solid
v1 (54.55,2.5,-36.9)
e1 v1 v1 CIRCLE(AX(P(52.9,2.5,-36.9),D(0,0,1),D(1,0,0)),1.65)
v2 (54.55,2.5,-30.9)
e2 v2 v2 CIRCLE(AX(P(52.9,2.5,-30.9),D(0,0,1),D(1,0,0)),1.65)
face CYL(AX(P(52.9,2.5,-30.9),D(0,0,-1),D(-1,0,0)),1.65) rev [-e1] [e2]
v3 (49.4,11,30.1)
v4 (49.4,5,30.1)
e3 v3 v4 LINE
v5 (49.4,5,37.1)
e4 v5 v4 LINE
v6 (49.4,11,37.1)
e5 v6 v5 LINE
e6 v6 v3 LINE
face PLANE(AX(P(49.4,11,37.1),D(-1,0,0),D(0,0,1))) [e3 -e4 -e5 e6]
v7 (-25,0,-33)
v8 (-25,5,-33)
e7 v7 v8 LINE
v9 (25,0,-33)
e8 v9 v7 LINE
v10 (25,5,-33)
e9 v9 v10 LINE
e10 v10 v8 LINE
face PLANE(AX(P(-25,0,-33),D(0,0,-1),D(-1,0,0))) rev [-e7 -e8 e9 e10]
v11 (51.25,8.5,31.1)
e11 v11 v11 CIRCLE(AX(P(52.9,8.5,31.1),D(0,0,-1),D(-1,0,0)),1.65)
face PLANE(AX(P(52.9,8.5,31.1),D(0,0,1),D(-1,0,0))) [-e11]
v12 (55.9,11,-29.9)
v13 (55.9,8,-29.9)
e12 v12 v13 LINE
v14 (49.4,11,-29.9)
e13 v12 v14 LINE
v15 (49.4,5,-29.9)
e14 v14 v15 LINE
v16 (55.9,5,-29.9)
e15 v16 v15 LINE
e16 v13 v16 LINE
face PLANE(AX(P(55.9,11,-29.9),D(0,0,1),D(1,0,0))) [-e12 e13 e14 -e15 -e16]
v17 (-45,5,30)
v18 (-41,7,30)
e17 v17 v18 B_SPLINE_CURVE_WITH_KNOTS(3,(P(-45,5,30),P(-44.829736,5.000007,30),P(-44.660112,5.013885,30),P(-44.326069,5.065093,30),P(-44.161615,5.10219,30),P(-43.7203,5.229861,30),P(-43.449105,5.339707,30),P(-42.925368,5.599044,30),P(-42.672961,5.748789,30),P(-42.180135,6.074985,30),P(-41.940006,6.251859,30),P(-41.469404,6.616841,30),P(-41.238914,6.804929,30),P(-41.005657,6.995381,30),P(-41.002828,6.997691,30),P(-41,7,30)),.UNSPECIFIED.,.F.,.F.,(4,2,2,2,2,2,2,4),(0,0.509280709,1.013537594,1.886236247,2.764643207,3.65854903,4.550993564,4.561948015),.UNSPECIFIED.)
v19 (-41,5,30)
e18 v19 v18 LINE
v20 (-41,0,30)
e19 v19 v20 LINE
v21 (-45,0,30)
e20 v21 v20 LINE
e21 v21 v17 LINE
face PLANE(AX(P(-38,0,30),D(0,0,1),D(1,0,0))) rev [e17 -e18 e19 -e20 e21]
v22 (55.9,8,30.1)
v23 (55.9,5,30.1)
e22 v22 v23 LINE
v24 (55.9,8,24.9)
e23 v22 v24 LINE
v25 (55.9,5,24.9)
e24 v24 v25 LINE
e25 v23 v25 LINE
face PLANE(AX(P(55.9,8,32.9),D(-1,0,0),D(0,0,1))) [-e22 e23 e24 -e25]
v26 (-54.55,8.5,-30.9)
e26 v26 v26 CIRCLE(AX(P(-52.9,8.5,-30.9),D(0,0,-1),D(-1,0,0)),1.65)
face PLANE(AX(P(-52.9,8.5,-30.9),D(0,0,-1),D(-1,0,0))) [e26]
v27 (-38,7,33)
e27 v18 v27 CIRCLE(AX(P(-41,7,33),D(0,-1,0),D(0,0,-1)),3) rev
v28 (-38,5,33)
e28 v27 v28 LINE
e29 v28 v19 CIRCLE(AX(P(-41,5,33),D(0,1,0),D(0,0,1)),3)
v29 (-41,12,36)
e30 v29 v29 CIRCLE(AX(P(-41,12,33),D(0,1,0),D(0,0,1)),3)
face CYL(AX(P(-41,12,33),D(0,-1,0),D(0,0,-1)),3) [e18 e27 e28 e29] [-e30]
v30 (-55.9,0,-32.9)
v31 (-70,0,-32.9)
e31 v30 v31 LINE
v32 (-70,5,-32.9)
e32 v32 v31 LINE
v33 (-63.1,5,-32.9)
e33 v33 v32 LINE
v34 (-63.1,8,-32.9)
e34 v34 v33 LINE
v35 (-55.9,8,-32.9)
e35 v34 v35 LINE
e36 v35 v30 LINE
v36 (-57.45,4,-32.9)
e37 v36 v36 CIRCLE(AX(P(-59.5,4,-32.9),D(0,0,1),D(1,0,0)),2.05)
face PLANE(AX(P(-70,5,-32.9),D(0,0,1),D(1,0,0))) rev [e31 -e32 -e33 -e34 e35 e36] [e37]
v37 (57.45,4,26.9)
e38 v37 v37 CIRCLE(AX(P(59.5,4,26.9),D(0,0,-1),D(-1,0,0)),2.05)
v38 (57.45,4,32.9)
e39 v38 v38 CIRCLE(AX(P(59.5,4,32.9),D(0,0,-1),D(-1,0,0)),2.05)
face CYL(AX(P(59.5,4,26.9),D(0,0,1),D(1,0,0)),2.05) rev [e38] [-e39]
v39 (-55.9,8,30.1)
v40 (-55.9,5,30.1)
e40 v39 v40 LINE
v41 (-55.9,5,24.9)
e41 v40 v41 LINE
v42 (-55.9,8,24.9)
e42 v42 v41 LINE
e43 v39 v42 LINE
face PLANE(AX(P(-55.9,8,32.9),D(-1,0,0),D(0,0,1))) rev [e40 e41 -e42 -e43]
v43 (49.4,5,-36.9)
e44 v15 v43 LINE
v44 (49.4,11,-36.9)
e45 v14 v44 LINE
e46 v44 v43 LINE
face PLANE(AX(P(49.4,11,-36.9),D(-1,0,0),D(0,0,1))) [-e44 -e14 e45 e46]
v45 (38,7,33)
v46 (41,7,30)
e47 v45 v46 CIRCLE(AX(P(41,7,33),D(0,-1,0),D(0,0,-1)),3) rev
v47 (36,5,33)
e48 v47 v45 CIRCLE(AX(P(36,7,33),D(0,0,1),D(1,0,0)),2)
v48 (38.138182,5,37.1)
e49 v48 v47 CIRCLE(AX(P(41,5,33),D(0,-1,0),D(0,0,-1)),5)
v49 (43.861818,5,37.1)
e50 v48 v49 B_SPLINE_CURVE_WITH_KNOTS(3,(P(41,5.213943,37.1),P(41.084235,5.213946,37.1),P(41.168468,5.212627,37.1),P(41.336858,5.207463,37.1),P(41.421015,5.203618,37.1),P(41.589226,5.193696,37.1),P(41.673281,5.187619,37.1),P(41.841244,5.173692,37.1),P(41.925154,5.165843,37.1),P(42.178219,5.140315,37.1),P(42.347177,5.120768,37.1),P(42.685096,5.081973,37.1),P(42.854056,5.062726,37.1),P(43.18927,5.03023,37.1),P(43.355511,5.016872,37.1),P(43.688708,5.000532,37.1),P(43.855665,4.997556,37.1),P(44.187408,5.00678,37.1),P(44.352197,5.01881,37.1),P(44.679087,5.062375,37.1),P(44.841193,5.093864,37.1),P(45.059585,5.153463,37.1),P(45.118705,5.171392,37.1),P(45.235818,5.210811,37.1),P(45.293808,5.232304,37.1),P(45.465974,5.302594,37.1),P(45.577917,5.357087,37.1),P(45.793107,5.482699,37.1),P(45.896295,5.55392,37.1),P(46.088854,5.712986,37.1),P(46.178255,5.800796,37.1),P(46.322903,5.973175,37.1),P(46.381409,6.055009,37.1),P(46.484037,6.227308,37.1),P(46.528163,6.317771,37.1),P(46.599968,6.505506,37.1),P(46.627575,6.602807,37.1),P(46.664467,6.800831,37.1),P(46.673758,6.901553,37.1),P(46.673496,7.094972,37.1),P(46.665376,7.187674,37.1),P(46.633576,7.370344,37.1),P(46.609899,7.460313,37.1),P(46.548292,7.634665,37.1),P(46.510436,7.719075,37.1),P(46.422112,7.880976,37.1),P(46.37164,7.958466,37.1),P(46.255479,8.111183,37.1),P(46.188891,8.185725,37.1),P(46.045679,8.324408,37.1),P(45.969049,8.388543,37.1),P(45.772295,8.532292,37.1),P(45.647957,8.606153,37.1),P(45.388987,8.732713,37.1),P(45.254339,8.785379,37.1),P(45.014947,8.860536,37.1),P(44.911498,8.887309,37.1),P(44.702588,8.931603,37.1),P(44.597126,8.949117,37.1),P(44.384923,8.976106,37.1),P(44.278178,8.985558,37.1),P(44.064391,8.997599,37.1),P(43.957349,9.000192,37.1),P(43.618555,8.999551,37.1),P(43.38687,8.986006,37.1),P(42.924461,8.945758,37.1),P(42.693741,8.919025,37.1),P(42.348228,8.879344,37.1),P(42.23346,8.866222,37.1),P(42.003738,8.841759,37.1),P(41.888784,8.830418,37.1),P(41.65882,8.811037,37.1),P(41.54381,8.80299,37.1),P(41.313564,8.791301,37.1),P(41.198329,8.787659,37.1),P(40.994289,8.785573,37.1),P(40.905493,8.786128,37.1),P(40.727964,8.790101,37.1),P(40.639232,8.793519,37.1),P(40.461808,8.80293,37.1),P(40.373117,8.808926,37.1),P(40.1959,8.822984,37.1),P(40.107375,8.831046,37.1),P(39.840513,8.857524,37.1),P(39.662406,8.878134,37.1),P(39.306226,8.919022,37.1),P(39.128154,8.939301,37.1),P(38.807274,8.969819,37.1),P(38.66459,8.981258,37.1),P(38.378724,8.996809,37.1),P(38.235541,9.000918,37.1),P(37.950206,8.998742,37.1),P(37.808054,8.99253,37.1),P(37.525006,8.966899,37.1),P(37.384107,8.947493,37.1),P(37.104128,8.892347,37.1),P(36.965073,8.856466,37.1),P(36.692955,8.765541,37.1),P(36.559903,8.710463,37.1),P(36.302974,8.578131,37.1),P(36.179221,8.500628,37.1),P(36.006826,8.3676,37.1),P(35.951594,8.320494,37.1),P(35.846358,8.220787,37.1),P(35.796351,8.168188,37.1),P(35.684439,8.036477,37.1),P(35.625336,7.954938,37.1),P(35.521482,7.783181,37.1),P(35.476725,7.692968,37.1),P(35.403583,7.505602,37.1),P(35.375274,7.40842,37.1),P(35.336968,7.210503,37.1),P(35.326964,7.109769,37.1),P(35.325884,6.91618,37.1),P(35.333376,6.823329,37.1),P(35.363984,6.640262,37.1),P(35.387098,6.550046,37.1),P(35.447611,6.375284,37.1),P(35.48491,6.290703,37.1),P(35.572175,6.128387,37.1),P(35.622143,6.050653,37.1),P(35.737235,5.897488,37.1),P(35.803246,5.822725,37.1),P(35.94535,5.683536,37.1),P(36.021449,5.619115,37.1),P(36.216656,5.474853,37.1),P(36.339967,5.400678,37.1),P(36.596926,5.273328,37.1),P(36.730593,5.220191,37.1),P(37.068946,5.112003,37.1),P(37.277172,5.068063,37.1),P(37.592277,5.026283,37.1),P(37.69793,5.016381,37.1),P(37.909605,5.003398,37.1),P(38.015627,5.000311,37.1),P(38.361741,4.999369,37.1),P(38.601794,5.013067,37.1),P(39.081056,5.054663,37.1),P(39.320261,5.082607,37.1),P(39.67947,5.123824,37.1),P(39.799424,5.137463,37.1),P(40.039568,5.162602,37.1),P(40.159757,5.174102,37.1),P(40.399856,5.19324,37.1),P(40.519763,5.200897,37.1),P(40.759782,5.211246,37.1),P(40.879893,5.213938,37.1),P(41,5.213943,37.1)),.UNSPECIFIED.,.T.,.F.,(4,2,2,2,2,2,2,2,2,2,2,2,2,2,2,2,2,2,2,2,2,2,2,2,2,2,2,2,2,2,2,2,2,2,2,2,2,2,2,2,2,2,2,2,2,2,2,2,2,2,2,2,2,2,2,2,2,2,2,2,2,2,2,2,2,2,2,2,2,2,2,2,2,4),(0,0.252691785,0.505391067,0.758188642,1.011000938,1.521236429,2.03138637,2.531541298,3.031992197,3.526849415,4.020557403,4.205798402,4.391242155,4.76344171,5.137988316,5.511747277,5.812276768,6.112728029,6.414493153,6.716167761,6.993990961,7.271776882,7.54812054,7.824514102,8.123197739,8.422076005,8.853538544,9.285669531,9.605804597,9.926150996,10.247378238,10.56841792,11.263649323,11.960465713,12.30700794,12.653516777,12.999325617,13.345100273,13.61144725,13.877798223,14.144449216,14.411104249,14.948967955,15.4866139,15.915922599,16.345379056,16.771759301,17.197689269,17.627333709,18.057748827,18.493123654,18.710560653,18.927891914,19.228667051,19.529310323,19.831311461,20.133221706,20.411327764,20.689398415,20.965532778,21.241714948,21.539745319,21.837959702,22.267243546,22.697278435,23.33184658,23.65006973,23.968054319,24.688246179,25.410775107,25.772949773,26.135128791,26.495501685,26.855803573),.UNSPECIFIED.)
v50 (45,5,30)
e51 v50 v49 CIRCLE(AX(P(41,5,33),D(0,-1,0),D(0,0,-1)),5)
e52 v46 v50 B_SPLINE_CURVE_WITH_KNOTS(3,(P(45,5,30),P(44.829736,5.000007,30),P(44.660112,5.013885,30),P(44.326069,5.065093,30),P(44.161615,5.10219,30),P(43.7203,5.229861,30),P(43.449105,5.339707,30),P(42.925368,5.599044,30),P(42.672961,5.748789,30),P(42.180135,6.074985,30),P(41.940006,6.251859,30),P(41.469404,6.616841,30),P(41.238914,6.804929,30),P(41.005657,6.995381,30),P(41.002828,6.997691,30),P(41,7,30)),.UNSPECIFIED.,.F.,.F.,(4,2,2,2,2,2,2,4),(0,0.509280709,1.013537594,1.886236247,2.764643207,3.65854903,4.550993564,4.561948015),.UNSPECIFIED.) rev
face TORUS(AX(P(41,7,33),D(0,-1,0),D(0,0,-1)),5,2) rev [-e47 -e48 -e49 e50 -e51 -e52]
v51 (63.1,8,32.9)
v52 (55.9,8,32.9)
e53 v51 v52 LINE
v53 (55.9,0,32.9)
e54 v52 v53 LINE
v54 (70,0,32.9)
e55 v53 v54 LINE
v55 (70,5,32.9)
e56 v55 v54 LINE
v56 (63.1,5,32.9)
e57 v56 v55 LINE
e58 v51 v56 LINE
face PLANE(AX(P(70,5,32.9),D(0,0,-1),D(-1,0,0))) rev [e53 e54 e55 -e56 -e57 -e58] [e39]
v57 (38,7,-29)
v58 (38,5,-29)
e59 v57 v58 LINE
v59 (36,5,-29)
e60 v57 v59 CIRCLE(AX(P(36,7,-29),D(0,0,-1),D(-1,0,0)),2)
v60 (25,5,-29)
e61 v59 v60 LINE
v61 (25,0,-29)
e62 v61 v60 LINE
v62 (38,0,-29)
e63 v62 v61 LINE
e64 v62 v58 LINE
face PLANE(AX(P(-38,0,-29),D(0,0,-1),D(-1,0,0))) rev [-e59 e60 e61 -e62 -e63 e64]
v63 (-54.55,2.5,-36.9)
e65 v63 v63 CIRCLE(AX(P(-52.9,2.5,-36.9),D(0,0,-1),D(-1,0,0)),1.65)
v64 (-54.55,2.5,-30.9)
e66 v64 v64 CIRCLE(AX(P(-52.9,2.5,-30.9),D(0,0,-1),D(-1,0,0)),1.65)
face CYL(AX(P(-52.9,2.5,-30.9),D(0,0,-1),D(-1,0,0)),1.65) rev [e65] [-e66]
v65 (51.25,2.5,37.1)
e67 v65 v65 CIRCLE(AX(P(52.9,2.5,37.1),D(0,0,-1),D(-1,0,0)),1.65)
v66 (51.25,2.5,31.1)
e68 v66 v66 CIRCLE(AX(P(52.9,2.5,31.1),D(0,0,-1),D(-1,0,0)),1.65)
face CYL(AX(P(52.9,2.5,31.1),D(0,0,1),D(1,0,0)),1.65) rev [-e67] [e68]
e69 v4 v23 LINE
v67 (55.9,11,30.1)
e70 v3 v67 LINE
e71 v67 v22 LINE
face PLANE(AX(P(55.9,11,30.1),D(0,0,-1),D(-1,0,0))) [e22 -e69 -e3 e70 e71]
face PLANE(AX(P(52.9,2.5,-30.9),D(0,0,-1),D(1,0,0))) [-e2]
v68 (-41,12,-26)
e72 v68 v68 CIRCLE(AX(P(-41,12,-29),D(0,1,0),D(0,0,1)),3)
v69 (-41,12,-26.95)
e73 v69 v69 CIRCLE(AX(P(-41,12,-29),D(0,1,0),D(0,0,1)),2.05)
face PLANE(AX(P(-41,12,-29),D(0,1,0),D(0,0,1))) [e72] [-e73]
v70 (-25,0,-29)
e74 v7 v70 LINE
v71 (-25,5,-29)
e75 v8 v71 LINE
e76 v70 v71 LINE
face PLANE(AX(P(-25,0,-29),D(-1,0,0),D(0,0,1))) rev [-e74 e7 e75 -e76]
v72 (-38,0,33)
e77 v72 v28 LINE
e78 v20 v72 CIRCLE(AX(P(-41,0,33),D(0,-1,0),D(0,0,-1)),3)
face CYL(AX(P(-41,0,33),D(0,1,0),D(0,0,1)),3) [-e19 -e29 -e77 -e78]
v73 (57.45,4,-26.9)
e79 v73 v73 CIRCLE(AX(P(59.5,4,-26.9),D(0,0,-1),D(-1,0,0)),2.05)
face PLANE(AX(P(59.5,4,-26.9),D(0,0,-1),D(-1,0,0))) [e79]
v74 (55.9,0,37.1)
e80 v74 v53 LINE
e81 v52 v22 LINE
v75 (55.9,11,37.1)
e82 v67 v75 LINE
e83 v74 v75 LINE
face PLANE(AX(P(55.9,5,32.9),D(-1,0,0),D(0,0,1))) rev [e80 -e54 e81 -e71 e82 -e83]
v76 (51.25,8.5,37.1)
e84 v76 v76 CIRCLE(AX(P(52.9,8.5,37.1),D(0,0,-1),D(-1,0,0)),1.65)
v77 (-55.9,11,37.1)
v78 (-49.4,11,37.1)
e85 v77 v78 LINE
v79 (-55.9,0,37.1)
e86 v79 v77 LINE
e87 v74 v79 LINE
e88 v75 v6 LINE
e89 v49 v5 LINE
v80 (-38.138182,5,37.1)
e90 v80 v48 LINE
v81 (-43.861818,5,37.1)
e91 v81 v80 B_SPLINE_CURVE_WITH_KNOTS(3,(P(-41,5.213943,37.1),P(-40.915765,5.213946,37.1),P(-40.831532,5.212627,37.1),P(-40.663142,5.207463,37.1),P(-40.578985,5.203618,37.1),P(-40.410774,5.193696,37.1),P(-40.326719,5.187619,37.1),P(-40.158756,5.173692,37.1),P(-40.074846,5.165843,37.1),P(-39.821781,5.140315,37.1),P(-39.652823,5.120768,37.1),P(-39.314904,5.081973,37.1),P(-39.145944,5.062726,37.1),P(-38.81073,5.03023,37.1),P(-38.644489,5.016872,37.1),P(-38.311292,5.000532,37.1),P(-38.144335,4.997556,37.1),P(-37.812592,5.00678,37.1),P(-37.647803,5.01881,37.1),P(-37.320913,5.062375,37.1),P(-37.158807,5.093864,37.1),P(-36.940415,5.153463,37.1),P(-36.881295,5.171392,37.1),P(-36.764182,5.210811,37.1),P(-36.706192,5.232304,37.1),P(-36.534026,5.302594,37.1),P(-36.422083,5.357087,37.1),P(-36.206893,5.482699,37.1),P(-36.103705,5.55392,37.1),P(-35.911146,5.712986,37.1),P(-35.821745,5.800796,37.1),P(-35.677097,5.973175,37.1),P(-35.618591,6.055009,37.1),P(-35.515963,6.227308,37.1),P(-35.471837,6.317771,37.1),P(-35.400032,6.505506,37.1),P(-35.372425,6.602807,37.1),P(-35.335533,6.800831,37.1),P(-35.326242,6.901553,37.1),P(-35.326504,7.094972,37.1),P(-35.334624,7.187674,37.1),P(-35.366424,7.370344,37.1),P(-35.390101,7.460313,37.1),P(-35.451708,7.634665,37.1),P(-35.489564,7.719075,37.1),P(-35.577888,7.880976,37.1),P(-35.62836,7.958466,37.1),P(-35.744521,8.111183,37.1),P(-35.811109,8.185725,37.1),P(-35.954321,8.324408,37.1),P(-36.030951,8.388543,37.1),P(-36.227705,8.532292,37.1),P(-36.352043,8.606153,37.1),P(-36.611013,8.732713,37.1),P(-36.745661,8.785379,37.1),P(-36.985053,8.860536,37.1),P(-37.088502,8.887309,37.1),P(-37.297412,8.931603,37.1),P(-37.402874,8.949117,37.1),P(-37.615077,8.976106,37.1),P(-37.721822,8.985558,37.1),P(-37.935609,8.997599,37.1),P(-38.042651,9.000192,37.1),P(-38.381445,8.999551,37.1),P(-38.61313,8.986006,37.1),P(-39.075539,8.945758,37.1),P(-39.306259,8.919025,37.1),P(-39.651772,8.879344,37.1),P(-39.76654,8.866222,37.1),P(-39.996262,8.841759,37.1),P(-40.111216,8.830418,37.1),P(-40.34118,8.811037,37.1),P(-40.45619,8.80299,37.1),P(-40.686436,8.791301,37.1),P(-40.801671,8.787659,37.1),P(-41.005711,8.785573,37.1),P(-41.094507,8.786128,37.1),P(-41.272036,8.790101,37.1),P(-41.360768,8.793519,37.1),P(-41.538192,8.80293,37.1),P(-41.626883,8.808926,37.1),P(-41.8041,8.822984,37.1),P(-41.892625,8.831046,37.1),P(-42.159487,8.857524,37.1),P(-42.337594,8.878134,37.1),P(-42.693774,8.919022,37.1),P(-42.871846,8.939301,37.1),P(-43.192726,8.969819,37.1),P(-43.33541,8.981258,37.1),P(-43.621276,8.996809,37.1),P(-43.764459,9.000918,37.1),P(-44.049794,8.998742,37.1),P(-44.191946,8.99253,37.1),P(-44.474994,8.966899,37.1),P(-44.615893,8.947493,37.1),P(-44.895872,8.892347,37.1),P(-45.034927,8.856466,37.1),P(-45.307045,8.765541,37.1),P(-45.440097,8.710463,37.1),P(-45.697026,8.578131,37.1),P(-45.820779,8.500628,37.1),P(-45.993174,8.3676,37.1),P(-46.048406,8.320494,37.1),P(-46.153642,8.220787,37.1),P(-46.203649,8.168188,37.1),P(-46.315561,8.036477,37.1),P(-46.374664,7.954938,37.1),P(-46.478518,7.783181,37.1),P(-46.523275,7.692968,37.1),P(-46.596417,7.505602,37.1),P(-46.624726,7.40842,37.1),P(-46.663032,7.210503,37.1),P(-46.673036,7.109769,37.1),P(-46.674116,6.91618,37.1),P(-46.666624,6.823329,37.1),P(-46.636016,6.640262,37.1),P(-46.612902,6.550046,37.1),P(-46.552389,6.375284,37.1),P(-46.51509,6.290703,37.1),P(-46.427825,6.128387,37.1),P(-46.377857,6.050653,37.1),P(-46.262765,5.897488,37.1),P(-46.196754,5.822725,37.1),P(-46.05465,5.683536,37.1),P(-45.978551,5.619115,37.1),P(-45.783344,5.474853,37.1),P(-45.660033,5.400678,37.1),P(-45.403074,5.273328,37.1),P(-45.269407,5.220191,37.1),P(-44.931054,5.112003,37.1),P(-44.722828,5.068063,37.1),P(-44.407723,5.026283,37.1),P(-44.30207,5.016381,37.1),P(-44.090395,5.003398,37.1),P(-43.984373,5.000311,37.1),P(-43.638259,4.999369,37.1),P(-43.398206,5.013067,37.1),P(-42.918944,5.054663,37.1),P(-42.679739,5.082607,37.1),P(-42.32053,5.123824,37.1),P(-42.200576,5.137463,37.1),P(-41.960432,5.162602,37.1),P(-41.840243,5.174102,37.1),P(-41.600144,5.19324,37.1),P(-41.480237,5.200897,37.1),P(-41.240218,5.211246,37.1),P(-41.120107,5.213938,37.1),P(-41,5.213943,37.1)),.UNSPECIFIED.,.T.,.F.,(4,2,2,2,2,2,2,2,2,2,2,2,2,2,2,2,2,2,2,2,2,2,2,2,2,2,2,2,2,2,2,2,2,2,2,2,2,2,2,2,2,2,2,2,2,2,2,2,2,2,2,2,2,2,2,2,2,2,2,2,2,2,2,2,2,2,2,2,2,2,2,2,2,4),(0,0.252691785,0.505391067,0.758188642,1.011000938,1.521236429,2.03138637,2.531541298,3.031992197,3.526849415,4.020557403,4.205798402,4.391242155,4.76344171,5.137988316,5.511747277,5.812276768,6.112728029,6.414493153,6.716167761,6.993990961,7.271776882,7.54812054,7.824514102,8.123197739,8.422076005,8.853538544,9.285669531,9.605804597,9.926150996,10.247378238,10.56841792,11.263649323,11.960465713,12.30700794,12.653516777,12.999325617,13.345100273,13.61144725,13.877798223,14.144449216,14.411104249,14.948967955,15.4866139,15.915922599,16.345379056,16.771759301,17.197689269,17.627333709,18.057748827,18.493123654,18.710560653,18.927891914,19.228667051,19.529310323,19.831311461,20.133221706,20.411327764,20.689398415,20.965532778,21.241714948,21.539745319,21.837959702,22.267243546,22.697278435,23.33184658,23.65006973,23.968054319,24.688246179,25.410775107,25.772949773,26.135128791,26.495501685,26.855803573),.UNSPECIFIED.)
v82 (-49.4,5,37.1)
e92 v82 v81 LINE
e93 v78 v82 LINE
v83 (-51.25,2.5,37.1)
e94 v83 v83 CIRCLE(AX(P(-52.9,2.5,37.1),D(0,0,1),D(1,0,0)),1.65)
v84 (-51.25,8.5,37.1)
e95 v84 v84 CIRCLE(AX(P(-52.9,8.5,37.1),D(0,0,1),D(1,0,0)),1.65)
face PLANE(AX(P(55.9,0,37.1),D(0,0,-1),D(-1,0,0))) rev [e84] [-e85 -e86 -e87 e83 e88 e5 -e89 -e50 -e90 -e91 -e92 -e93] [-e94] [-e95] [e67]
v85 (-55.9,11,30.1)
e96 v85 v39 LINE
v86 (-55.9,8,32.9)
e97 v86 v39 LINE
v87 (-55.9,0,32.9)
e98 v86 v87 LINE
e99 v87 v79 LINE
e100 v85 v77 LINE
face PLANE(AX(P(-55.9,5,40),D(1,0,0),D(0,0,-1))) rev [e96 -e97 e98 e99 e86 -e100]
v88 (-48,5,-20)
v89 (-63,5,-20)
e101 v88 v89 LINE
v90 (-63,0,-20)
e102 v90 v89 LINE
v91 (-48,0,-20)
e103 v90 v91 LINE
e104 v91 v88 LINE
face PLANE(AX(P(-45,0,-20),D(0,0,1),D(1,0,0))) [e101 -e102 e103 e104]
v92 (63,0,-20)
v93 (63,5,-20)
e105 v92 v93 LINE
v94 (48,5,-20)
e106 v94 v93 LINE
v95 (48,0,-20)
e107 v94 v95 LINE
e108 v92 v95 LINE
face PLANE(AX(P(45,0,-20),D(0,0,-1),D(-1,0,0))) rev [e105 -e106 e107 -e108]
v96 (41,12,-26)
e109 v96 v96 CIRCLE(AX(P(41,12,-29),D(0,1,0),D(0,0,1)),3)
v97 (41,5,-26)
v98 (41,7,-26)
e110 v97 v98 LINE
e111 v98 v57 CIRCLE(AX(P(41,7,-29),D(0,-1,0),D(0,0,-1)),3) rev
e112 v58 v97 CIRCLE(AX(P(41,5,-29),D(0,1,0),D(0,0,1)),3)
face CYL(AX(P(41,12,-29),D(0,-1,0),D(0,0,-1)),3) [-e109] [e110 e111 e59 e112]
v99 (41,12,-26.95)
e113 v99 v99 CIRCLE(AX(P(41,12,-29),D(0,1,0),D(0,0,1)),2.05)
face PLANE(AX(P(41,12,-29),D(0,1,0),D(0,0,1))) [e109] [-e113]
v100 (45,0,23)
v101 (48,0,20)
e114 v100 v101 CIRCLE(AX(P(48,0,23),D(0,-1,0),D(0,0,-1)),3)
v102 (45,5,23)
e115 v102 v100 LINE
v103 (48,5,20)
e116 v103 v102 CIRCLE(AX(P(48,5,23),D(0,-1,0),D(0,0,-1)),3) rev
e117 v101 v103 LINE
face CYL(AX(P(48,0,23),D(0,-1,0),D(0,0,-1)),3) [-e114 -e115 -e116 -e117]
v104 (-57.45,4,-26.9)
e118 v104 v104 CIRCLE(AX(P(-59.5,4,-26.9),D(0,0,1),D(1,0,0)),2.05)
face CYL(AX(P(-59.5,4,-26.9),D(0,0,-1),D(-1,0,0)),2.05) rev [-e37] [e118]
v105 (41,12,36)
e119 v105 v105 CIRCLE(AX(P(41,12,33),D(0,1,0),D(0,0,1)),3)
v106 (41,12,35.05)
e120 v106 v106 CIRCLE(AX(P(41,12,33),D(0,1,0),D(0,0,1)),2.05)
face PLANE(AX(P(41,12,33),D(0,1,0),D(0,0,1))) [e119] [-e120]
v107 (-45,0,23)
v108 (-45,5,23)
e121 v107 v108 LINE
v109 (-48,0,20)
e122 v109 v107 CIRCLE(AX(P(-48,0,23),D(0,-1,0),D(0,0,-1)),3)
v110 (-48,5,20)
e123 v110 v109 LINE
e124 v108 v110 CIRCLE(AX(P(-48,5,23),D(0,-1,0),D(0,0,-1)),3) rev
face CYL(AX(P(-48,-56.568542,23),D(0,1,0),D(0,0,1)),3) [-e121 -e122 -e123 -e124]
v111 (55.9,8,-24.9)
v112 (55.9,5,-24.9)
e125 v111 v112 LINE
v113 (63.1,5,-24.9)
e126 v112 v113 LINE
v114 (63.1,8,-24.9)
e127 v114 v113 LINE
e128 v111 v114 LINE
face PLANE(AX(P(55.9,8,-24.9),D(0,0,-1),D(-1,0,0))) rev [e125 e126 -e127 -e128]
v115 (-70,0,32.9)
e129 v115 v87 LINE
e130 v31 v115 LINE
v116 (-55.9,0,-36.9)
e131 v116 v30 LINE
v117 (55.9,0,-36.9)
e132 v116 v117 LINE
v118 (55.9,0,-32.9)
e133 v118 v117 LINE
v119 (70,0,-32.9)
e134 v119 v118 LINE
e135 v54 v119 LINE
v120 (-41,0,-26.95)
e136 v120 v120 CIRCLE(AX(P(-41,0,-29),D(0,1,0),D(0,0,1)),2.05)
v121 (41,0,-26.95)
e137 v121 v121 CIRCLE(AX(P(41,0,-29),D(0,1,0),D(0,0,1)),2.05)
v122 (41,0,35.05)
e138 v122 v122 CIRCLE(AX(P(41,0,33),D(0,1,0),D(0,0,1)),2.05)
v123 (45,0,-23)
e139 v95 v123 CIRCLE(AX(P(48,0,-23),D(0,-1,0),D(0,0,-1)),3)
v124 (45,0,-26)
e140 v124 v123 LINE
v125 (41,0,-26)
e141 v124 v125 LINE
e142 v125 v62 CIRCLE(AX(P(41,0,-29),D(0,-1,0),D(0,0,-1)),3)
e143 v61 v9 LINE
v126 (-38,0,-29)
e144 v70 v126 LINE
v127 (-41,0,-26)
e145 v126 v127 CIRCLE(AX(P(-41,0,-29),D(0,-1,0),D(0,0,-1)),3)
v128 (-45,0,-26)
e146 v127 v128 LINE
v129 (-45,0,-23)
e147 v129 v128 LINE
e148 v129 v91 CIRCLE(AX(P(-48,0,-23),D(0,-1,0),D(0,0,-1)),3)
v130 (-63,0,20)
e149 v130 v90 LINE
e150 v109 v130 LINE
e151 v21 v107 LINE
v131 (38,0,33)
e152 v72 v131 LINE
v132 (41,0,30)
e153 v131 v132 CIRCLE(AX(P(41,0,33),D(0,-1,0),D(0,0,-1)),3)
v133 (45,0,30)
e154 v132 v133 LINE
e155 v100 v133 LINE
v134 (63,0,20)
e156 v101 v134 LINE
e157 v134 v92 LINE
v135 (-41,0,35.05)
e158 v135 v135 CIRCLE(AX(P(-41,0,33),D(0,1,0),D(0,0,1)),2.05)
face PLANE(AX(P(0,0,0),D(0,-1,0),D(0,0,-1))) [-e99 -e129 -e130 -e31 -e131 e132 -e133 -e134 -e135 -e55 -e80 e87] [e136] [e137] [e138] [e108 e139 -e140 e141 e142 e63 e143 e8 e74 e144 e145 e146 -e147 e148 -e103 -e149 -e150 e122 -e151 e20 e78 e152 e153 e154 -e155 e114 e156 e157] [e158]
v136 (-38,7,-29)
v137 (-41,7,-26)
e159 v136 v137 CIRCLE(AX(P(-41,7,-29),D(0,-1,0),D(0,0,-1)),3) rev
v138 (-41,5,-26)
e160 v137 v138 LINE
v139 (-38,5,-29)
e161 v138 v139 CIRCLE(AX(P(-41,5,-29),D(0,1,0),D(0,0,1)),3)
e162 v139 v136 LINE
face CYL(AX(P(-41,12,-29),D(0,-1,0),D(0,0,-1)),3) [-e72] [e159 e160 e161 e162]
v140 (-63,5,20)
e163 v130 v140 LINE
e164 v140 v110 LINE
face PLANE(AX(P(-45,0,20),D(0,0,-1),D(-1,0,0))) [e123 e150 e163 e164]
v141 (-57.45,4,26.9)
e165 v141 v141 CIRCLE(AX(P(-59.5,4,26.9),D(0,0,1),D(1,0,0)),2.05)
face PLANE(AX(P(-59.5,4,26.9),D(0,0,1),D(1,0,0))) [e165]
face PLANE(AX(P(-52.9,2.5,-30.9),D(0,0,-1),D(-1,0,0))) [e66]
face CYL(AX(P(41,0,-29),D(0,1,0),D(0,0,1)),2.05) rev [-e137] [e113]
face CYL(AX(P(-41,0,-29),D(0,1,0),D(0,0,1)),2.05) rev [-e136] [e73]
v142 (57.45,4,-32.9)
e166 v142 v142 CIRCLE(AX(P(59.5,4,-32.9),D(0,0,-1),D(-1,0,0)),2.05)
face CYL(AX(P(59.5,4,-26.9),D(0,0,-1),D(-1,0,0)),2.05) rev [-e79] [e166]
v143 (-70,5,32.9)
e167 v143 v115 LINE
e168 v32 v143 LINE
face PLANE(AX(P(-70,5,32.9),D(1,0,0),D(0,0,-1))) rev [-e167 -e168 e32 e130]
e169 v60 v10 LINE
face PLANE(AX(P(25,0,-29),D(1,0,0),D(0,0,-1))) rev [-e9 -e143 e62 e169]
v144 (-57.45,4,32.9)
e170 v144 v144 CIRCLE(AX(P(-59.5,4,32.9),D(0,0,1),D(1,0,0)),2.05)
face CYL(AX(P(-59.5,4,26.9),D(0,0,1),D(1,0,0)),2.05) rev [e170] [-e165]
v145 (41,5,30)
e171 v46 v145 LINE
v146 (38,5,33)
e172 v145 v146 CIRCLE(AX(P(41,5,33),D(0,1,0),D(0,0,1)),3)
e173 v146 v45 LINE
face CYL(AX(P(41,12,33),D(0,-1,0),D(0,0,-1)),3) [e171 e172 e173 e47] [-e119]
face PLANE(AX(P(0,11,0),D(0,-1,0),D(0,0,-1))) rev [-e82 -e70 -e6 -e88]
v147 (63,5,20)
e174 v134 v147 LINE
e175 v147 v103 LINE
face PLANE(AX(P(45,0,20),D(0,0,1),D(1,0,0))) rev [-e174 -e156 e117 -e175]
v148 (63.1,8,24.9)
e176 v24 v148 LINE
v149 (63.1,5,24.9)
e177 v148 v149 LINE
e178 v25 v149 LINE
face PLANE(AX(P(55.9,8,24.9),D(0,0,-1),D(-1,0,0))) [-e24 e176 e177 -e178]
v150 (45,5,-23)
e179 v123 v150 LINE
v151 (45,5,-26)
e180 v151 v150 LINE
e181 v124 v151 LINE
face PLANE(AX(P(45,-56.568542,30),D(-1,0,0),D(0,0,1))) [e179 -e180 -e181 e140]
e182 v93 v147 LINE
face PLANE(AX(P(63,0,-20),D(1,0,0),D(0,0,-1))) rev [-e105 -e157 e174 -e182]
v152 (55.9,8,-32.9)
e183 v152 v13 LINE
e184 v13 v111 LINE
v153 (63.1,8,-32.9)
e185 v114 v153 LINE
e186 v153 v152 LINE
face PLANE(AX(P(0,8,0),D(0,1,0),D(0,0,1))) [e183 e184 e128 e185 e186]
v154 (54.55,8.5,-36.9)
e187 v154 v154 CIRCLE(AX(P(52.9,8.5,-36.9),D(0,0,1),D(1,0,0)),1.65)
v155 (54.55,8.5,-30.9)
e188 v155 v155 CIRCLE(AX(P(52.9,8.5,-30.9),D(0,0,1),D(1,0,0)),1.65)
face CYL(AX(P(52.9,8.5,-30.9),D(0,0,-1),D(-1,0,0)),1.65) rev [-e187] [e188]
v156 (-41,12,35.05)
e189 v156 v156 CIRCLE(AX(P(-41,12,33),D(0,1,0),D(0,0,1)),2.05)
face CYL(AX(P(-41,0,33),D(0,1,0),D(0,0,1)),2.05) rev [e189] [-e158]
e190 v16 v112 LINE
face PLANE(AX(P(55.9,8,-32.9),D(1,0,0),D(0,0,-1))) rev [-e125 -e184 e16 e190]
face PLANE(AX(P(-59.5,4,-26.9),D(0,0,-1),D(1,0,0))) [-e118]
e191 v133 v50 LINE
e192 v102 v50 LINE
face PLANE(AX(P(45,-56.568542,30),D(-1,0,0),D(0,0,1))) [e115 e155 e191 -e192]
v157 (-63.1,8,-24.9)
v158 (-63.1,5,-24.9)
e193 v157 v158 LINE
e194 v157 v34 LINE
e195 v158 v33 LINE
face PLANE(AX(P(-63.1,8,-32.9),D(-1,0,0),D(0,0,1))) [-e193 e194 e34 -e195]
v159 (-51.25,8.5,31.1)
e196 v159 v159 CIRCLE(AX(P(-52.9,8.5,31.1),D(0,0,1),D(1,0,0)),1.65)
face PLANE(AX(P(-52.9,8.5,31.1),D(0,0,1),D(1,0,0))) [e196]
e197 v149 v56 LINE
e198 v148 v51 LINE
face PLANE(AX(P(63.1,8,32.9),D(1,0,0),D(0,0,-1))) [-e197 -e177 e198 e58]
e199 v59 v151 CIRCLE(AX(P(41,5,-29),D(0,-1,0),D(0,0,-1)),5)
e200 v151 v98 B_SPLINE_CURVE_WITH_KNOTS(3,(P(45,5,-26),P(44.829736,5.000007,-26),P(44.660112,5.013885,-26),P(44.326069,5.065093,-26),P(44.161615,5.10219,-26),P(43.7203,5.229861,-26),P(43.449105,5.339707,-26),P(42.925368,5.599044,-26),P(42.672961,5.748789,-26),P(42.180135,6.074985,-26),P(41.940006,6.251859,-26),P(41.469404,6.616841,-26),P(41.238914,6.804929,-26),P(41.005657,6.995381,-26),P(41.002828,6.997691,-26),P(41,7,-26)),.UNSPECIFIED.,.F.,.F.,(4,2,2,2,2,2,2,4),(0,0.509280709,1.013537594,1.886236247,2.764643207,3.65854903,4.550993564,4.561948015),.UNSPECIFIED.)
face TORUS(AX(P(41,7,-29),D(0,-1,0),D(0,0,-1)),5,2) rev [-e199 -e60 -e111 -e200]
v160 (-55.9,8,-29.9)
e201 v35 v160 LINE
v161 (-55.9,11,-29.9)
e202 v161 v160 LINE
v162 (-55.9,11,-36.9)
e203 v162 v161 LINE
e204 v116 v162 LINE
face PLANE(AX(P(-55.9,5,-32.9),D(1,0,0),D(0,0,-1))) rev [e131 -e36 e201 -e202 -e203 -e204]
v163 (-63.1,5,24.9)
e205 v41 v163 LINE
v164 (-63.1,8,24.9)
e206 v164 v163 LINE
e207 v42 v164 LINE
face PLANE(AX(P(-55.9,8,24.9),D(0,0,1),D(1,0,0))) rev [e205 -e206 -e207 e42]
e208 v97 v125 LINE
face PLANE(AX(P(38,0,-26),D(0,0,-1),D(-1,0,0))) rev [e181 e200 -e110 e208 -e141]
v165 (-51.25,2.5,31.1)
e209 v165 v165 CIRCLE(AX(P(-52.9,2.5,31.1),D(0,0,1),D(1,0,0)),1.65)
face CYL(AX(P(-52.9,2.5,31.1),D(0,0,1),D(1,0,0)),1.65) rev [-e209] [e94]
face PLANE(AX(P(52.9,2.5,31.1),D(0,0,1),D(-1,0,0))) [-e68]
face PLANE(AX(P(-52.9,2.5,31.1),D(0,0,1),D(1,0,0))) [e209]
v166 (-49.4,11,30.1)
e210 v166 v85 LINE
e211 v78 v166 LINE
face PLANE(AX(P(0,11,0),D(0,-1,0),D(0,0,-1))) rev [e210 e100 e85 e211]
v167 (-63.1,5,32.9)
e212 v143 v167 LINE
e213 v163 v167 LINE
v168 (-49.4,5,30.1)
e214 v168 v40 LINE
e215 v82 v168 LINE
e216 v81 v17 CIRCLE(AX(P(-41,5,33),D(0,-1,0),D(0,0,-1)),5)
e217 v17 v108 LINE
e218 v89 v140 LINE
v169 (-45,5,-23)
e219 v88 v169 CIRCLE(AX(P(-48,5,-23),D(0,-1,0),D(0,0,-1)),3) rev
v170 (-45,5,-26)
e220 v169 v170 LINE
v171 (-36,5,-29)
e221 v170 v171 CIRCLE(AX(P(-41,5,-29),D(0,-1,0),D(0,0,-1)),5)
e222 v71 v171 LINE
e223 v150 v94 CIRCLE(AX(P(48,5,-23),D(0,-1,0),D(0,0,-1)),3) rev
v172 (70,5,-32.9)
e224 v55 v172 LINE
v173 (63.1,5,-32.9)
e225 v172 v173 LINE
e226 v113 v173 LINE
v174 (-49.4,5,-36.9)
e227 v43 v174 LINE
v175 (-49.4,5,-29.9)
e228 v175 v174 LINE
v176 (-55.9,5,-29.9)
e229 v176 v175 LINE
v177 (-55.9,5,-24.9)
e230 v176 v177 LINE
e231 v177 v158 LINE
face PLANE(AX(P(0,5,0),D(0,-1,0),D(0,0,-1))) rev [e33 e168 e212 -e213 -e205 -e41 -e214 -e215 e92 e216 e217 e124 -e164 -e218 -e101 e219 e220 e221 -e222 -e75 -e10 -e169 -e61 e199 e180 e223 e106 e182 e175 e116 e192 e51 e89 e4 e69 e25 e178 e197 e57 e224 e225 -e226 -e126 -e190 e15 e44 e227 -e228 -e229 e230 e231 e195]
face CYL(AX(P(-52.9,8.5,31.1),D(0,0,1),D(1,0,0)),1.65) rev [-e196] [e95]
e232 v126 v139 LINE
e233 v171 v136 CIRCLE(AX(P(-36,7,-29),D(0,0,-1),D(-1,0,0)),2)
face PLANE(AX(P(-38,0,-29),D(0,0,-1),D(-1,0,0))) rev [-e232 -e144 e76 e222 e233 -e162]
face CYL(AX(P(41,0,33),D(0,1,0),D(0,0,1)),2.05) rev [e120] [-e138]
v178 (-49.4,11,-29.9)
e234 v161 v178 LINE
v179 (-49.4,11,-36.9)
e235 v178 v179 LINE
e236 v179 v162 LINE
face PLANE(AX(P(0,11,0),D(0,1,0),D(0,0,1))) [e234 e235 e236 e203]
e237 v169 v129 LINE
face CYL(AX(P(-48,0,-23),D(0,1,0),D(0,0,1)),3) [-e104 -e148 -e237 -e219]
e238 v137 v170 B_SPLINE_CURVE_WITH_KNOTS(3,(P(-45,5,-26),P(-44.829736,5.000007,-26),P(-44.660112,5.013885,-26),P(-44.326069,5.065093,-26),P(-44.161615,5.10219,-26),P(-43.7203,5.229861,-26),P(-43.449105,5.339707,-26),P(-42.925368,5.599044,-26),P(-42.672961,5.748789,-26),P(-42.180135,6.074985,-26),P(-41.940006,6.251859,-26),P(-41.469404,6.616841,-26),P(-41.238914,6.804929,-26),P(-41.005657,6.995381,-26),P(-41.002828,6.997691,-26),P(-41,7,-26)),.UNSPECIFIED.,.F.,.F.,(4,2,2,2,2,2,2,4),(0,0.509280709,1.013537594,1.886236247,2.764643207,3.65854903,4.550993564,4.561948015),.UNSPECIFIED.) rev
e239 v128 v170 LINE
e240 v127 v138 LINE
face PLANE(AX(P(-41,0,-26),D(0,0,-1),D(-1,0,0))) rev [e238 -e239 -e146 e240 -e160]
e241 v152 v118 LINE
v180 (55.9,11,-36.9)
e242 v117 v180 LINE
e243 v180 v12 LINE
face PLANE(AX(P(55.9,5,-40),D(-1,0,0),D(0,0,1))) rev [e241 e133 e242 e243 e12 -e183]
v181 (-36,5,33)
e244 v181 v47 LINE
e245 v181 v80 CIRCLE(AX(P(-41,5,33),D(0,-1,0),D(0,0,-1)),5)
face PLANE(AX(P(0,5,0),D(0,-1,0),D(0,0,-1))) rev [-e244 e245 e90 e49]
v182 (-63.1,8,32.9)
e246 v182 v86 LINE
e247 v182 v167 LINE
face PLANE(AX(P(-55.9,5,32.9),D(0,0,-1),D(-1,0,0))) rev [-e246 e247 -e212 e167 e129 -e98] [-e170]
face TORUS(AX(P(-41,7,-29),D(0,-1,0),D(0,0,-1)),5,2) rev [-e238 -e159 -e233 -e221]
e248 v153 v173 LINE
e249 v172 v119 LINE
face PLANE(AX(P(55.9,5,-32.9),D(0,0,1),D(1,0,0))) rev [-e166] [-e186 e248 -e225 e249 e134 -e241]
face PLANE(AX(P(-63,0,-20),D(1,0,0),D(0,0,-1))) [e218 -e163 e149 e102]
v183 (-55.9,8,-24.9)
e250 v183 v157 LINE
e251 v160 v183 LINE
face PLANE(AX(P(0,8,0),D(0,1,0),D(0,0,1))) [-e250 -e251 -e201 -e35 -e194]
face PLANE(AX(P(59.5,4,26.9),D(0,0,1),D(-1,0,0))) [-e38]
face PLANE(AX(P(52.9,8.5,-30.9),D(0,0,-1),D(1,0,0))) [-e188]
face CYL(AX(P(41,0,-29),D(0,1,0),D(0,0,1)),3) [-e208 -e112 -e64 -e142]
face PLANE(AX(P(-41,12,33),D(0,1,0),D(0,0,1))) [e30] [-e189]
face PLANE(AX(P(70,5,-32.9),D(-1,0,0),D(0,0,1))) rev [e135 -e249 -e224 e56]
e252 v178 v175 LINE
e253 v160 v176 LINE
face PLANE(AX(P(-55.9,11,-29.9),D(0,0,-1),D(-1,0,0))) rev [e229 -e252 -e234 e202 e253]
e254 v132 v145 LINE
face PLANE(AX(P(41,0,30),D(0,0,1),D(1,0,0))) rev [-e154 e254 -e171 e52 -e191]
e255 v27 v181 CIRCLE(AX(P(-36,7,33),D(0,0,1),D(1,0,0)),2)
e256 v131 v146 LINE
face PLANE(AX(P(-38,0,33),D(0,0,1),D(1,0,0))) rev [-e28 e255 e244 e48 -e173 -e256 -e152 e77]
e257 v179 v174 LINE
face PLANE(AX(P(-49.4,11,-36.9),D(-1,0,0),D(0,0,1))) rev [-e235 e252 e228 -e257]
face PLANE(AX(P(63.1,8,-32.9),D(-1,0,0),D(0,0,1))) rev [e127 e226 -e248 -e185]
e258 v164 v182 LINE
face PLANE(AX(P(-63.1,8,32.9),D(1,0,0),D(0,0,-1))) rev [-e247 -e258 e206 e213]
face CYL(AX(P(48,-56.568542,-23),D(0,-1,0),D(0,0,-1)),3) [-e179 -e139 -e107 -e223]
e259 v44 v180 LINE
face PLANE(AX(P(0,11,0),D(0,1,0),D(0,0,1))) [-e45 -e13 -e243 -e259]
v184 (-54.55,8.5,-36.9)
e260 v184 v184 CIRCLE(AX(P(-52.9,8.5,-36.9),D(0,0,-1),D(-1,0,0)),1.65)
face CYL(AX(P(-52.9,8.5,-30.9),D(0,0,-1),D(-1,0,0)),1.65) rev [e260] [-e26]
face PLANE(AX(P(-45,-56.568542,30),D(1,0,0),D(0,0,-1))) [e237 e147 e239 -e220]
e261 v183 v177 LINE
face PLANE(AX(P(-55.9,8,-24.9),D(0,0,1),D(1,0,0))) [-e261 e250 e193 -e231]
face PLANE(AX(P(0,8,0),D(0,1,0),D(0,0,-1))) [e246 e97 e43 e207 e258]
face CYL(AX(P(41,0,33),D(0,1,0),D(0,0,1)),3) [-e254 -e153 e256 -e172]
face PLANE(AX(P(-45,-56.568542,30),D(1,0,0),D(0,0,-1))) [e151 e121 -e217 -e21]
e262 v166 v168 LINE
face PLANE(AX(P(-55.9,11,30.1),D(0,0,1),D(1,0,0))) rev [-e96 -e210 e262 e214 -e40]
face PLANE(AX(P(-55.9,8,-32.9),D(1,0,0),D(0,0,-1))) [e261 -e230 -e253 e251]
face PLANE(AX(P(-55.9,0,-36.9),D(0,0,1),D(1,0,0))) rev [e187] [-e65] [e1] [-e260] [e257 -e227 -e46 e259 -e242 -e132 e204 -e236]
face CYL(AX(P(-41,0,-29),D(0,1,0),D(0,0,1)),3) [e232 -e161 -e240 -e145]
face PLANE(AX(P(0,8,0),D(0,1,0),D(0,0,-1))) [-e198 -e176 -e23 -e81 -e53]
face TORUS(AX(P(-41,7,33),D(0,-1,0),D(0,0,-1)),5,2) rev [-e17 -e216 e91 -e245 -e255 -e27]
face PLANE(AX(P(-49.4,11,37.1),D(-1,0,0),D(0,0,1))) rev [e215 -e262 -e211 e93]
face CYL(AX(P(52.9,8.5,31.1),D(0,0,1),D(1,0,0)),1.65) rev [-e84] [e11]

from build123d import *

# Parameters (mm, degrees)
BOSS_EXTRUDE1_DEPTH     = 5
CUT_EXTRUDE1_DEPTH      = 81.777472107
SKETCH3_R               = 3
BOSS_EXTRUDE2_DEPTH     = 7
CUT_EXTRUDE2_DEPTH      = 82.510735489
CUT_EXTRUDE2_DEPTH_BACK = 82.510735489
SKETCH4_R               = 2.05
SKETCH5_W               = 12
SKETCH5_H               = 56
CUT_EXTRUDE3_DEPTH      = 81.925892025
FILLET1_R               = 3
SKETCH6_W               = 50
SKETCH6_H               = 4
CUT_EXTRUDE4_DEPTH      = 81.925892025
SKETCH7_W               = 7.2
SKETCH7_H               = 8
BOSS_EXTRUDE3_DEPTH     = 3
SKETCH8_R               = 2.05
CUT_EXTRUDE5_DEPTH      = 6
MIRROR4_COPY_1_SKETCH_W = 7.2
MIRROR4_COPY_1_SKETCH_H = 8
MIRROR4_COPY_1_DEPTH    = 3
MIRROR4_COPY_2_SKETCH_R = 2.05
MIRROR4_COPY_2_DEPTH    = 6
SKETCH10_W              = 111.8
SKETCH10_H              = 1
CUT_EXTRUDE7_DEPTH      = 81.925892025
FILLET5_R               = 2
SKETCH11_W              = 8
SKETCH11_H              = 56
BOSS_EXTRUDE4_DEPTH     = 5
SKETCH12_W              = 18
SKETCH12_H              = 40
CUT_EXTRUDE8_DEPTH      = 81.436310209
FILLET6_R               = 3
CUT_EXTRUDE9_DEPTH      = 81.436310209
CUT_EXTRUDE9_DEPTH_BACK = 81.436310209
SKETCH13_W              = 111.8
SKETCH13_H              = 2.1
SKETCH13_H_2            = 1.9
SKETCH14_W              = 6.5
SKETCH14_H              = 7
BOSS_EXTRUDE5_DEPTH     = 6
SKETCH15_R              = 1.65
CUT_EXTRUDE10_DEPTH     = 6
CUT_EXTRUDE11_START     = -6
SKETCH16_R              = 1.65
CUT_EXTRUDE11_DEPTH     = 6


# Some blends are built 0.0001 mm under size
with BuildPart() as part:
    # Sketch1 → Boss-Extrude1 (new body)
    with BuildSketch(Plane(origin=(0, 0, 0), x_dir=(1, 0, 0), z_dir=(0, 1, 0))):
        Polygon((-70, -32.9), (-70, 32.9), (-55.9, 32.9), (-55.9, 40), (55.9, 40), (55.9, 32.9), (70, 32.9), (70, -32.9), (55.9, -32.9), (55.9, -40), (-55.9, -40), (-55.9, -32.9), align=None)
    extrude(amount=BOSS_EXTRUDE1_DEPTH)

    # Sketch2 → Cut-Extrude1 (cut, through all)
    with BuildSketch(Plane(origin=(0, 5, 0), x_dir=(1, 0, 0), z_dir=(0, 1, 0))):
        Polygon((-41, 26), (-38, 26), (-38, 29), (38, 29), (38, 26), (41, 26), (41, -30), (38, -30), (38, -33), (-38, -33), (-38, -30), (-41, -30), align=None)
    extrude(amount=-CUT_EXTRUDE1_DEPTH, mode=Mode.SUBTRACT)

    # Sketch3 → Boss-Extrude2 (add)
    with BuildSketch(Plane(origin=(0, 5, 0), x_dir=(1, 0, 0), z_dir=(0, 1, 0))):
        with Locations(Location((-41, -33, 0), (0, 0, 90))):
            Circle(SKETCH3_R)
        with Locations(Location((41, -33, 0), (0, 0, 90))):
            Circle(SKETCH3_R)
        with Locations(Location((41, 29, 0), (0, 0, 270))):
            Circle(SKETCH3_R)
        with Locations(Location((-41, 29, 0), (0, 0, 270))):
            Circle(SKETCH3_R)
    extrude(amount=BOSS_EXTRUDE2_DEPTH)

    # Sketch4 → Cut-Extrude2 (cut, two sides: drawn at the far end of the back side and taken through both)
    with BuildSketch(Plane(origin=(0, 12, 0), x_dir=(1, 0, 0), z_dir=(0, 1, 0)).offset(-CUT_EXTRUDE2_DEPTH_BACK)):
        with Locations(Location((-41, 29, 0), (0, 0, 270))):
            Circle(SKETCH4_R)
        with Locations(Location((41, 29, 0), (0, 0, 270))):
            Circle(SKETCH4_R)
        with Locations(Location((41, -33, 0), (0, 0, 270))):
            Circle(SKETCH4_R)
        with Locations(Location((-41, -33, 0), (0, 0, 270))):
            Circle(SKETCH4_R)
    extrude(amount=CUT_EXTRUDE2_DEPTH + CUT_EXTRUDE2_DEPTH_BACK, mode=Mode.SUBTRACT)

    # Sketch5 → Cut-Extrude3 (cut, through all)
    with BuildSketch(Plane(origin=(0, 5, 0), x_dir=(1, 0, 0), z_dir=(0, 1, 0))):
        with Locations((-47, -2)):
            Rectangle(SKETCH5_W, SKETCH5_H)
        with Locations((47, -2)):
            Rectangle(SKETCH5_W, SKETCH5_H)
    extrude(amount=-CUT_EXTRUDE3_DEPTH, mode=Mode.SUBTRACT)

    # Fillet1
    fillet1_edges = [part.edges().sort_by_distance(p)[0] for p in [
        (38, 2.5, 30),
        (-38, 2.5, 30),
        (38, 2.5, -26),
        (-38, 2.5, -26),
    ]]
    fillet(fillet1_edges, radius=FILLET1_R - 0.0001)  # a hair under: the kernel refuses the full size

    # Sketch6 → Cut-Extrude4 (cut, through all)
    with BuildSketch(Plane(origin=(0, 5, 0), x_dir=(1, 0, 0), z_dir=(0, 1, 0))):
        with Locations((0, 31)):
            Rectangle(SKETCH6_W, SKETCH6_H)
    extrude(amount=-CUT_EXTRUDE4_DEPTH, mode=Mode.SUBTRACT)

    # Sketch7 → Boss-Extrude3 (add)
    with BuildSketch(Plane(origin=(0, 5, 0), x_dir=(1, 0, 0), z_dir=(0, 1, 0))):
        with Locations((59.5, 28.9)):
            Rectangle(SKETCH7_W, SKETCH7_H)
    boss_extrude3 = extrude(amount=BOSS_EXTRUDE3_DEPTH)

    # Sketch8 → Cut-Extrude5 (cut)
    with BuildSketch(Plane(origin=(0, 0, -32.9), x_dir=(-1, 0, 0), z_dir=(0, 0, -1))):
        with Locations((-59.5, 4)):
            Circle(SKETCH8_R)
    cut_extrude5 = extrude(amount=-CUT_EXTRUDE5_DEPTH, mode=Mode.SUBTRACT)

    # Mirror3: Boss-Extrude3, Cut-Extrude5 across plane
    add(boss_extrude3.mirror(Plane(origin=(0, 0, 0), x_dir=(0, 0, 1), z_dir=(1, 0, 0))))
    add(cut_extrude5.mirror(Plane(origin=(0, 0, 0), x_dir=(0, 0, 1), z_dir=(1, 0, 0))), mode=Mode.SUBTRACT)

    # Mirror4: Boss-Extrude3, Cut-Extrude5 across plane
    add(boss_extrude3.mirror(Plane.XY))
    add(cut_extrude5.mirror(Plane.XY), mode=Mode.SUBTRACT)

    # Mirror4 copy 1 sketch → Mirror4 copy 1 (add)
    with BuildSketch(Plane(origin=(0, 5, 0), x_dir=(-1, 0, 0), z_dir=(0, 1, 0))):
        with Locations((59.5, 28.9)):
            Rectangle(MIRROR4_COPY_1_SKETCH_W, MIRROR4_COPY_1_SKETCH_H)
    extrude(amount=MIRROR4_COPY_1_DEPTH)

    # Mirror4 copy 2 sketch → Mirror4 copy 2 (cut)
    with BuildSketch(Plane.XY.offset(32.9)):
        with Locations((-59.5, 4)):
            Circle(MIRROR4_COPY_2_SKETCH_R)
    extrude(amount=-MIRROR4_COPY_2_DEPTH, mode=Mode.SUBTRACT)

    # Sketch10 → Cut-Extrude7 (cut, through all)
    with BuildSketch(Plane(origin=(0, 5, 0), x_dir=(1, 0, 0), z_dir=(0, 1, 0))):
        with Locations((0, 39.5)):
            Rectangle(SKETCH10_W, SKETCH10_H)
        with Locations((0, -39.5)):
            Rectangle(SKETCH10_W, SKETCH10_H)
    extrude(amount=-CUT_EXTRUDE7_DEPTH, mode=Mode.SUBTRACT)

    # Fillet5
    # the kernel refuses this fillet: 2 mm, written as the material it adds along each edge
    with BuildSketch(Plane(origin=(41, 5, 33), x_dir=(-1, 0, 0), z_dir=(0, 0, -1))) as fillet5_piece_1_section:
        with BuildLine():
            CenterArc((3 + FILLET5_R, FILLET5_R), FILLET5_R, 180, 90)
            Line((3, FILLET5_R), (3, 0))
            Line((3, 0), (3 + FILLET5_R, 0))
        make_face()
    fillet5_piece_1 = revolve(axis=Axis((41, 5, 33), (0, 1, 0)), revolution_arc=270, mode=Mode.PRIVATE)
    fillet5_piece_1 = split(fillet5_piece_1, bisect_by=Plane(origin=(37.573130255, 5.322558535, 30), z_dir=(0, 0, 1)), keep=Keep.TOP, mode=Mode.PRIVATE)
    add(fillet5_piece_1)
    with BuildSketch(Plane(origin=(-41, 5, 33), x_dir=(0, 0, -1), z_dir=(1, 0, 0))) as fillet5_piece_2_section:
        with BuildLine():
            CenterArc((3 + FILLET5_R, FILLET5_R), FILLET5_R, 180, 90)
            Line((3, FILLET5_R), (3, 0))
            Line((3, 0), (3 + FILLET5_R, 0))
        make_face()
    fillet5_piece_2 = revolve(axis=Axis((-41, 5, 33), (0, 1, 0)), revolution_arc=270, mode=Mode.PRIVATE)
    fillet5_piece_2 = split(fillet5_piece_2, bisect_by=Plane(origin=(-43.742596375, 5.466410384, 30), z_dir=(0, 0, 1)), keep=Keep.TOP, mode=Mode.PRIVATE)
    add(fillet5_piece_2)
    with BuildSketch(Plane(origin=(41, 5, -29), x_dir=(0, 0, 1), z_dir=(-1, 0, 0))) as fillet5_piece_3_section:
        with BuildLine():
            CenterArc((3 + FILLET5_R, FILLET5_R), FILLET5_R, 180, 90)
            Line((3, FILLET5_R), (3, 0))
            Line((3, 0), (3 + FILLET5_R, 0))
        make_face()
    fillet5_piece_3 = revolve(axis=Axis((41, 5, -29), (0, 1, 0)), revolution_arc=270, mode=Mode.PRIVATE)
    fillet5_piece_3 = split(fillet5_piece_3, bisect_by=Plane(origin=(43.742596375, 5.466410384, -26), z_dir=(0, 0, -1)), keep=Keep.TOP, mode=Mode.PRIVATE)
    add(fillet5_piece_3)
    with BuildSketch(Plane(origin=(-41, 5, -29), x_dir=(1, 0, 0), z_dir=(0, 0, 1))) as fillet5_piece_4_section:
        with BuildLine():
            CenterArc((3 + FILLET5_R, FILLET5_R), FILLET5_R, 180, 90)
            Line((3 + FILLET5_R, 0), (3, 0))
            Line((3, 0), (3, FILLET5_R))
        make_face()
    fillet5_piece_4 = revolve(axis=Axis((-41, 5, -29), (0, 1, 0)), revolution_arc=270, mode=Mode.PRIVATE)
    fillet5_piece_4 = split(fillet5_piece_4, bisect_by=Plane(origin=(-41, 5.571713042, -26), z_dir=(0, 0, -1)), keep=Keep.TOP, mode=Mode.PRIVATE)
    add(fillet5_piece_4)

    # Sketch11 → Boss-Extrude4 (add)
    with BuildSketch(Plane(origin=(0, 5, 0), x_dir=(1, 0, 0), z_dir=(0, 1, 0))):
        with Locations((49, -2)):
            Rectangle(SKETCH11_W, SKETCH11_H)
        with Locations((-49, -2)):
            Rectangle(SKETCH11_W, SKETCH11_H)
    extrude(amount=-BOSS_EXTRUDE4_DEPTH)

    # Sketch12 → Cut-Extrude8 (cut, symmetric)
    with BuildSketch(Plane(origin=(0, 5, 0), x_dir=(1, 0, 0), z_dir=(0, 1, 0))):
        with Locations((54, 0)):
            Rectangle(SKETCH12_W, SKETCH12_H)
    cut_extrude8 = extrude(amount=CUT_EXTRUDE8_DEPTH, both=True, mode=Mode.SUBTRACT)

    # Mirror7: Cut-Extrude8 across plane
    add(cut_extrude8.mirror(Plane(origin=(0, 0, 0), x_dir=(0, 0, 1), z_dir=(1, 0, 0))), mode=Mode.SUBTRACT)

    # Fillet6
    fillet6_edges = [part.edges().sort_by_distance(p)[0] for p in [
        (45, 2.5, 20),
        (45, 2.5, -20),
        (-45, 2.5, -20),
        (-45, 2.5, 20),
    ]]
    fillet(fillet6_edges, radius=FILLET6_R)

    # Sketch13 → Cut-Extrude9 (cut, two sides: drawn at the far end of the back side and taken through both)
    with BuildSketch(Plane(origin=(0, 5, 0), x_dir=(1, 0, 0), z_dir=(0, 1, 0)).offset(-CUT_EXTRUDE9_DEPTH_BACK)):
        with Locations((0, 37.95)):
            Rectangle(SKETCH13_W, SKETCH13_H)
        with Locations((0, -38.05)):
            Rectangle(SKETCH13_W, SKETCH13_H_2)
    extrude(amount=CUT_EXTRUDE9_DEPTH + CUT_EXTRUDE9_DEPTH_BACK, mode=Mode.SUBTRACT)

    # Sketch14 → Boss-Extrude5 (add)
    with BuildSketch(Plane(origin=(0, 5, 0), x_dir=(1, 0, 0), z_dir=(0, 1, 0))):
        with Locations((-52.65, -33.6)):
            Rectangle(SKETCH14_W, SKETCH14_H)
        with Locations((-52.65, 33.4)):
            Rectangle(SKETCH14_W, SKETCH14_H)
    boss_extrude5 = extrude(amount=BOSS_EXTRUDE5_DEPTH)

    # Sketch15 → Cut-Extrude10 (cut)
    with BuildSketch(Plane.XY.offset(37.1)):
        with Locations((-52.9, 2.5)):
            Circle(SKETCH15_R)
        with Locations((-52.9, 8.5)):
            Circle(SKETCH15_R)
    cut_extrude10 = extrude(amount=-CUT_EXTRUDE10_DEPTH, mode=Mode.SUBTRACT)

    # Sketch16 → Cut-Extrude11 (cut)
    with BuildSketch(Plane(origin=(0, 0, -36.9), x_dir=(-1, 0, 0), z_dir=(0, 0, -1)).offset(CUT_EXTRUDE11_START)):
        with Locations(Location((52.9, 8.5, 0), (0, 0, 180))):
            Circle(SKETCH16_R)
        with Locations(Location((52.9, 2.5, 0), (0, 0, 180))):
            Circle(SKETCH16_R)
    cut_extrude11 = extrude(amount=CUT_EXTRUDE11_DEPTH, mode=Mode.SUBTRACT)

    # Mirror8: Boss-Extrude5, Cut-Extrude10, Cut-Extrude11 across plane
    add(boss_extrude5.mirror(Plane(origin=(0, 0, 0), x_dir=(0, 0, 1), z_dir=(1, 0, 0))))
    add(cut_extrude10.mirror(Plane(origin=(0, 0, 0), x_dir=(0, 0, 1), z_dir=(1, 0, 0))), mode=Mode.SUBTRACT)
    add(cut_extrude11.mirror(Plane(origin=(0, 0, 0), x_dir=(0, 0, 1), z_dir=(1, 0, 0))), mode=Mode.SUBTRACT)


solid = part.part
